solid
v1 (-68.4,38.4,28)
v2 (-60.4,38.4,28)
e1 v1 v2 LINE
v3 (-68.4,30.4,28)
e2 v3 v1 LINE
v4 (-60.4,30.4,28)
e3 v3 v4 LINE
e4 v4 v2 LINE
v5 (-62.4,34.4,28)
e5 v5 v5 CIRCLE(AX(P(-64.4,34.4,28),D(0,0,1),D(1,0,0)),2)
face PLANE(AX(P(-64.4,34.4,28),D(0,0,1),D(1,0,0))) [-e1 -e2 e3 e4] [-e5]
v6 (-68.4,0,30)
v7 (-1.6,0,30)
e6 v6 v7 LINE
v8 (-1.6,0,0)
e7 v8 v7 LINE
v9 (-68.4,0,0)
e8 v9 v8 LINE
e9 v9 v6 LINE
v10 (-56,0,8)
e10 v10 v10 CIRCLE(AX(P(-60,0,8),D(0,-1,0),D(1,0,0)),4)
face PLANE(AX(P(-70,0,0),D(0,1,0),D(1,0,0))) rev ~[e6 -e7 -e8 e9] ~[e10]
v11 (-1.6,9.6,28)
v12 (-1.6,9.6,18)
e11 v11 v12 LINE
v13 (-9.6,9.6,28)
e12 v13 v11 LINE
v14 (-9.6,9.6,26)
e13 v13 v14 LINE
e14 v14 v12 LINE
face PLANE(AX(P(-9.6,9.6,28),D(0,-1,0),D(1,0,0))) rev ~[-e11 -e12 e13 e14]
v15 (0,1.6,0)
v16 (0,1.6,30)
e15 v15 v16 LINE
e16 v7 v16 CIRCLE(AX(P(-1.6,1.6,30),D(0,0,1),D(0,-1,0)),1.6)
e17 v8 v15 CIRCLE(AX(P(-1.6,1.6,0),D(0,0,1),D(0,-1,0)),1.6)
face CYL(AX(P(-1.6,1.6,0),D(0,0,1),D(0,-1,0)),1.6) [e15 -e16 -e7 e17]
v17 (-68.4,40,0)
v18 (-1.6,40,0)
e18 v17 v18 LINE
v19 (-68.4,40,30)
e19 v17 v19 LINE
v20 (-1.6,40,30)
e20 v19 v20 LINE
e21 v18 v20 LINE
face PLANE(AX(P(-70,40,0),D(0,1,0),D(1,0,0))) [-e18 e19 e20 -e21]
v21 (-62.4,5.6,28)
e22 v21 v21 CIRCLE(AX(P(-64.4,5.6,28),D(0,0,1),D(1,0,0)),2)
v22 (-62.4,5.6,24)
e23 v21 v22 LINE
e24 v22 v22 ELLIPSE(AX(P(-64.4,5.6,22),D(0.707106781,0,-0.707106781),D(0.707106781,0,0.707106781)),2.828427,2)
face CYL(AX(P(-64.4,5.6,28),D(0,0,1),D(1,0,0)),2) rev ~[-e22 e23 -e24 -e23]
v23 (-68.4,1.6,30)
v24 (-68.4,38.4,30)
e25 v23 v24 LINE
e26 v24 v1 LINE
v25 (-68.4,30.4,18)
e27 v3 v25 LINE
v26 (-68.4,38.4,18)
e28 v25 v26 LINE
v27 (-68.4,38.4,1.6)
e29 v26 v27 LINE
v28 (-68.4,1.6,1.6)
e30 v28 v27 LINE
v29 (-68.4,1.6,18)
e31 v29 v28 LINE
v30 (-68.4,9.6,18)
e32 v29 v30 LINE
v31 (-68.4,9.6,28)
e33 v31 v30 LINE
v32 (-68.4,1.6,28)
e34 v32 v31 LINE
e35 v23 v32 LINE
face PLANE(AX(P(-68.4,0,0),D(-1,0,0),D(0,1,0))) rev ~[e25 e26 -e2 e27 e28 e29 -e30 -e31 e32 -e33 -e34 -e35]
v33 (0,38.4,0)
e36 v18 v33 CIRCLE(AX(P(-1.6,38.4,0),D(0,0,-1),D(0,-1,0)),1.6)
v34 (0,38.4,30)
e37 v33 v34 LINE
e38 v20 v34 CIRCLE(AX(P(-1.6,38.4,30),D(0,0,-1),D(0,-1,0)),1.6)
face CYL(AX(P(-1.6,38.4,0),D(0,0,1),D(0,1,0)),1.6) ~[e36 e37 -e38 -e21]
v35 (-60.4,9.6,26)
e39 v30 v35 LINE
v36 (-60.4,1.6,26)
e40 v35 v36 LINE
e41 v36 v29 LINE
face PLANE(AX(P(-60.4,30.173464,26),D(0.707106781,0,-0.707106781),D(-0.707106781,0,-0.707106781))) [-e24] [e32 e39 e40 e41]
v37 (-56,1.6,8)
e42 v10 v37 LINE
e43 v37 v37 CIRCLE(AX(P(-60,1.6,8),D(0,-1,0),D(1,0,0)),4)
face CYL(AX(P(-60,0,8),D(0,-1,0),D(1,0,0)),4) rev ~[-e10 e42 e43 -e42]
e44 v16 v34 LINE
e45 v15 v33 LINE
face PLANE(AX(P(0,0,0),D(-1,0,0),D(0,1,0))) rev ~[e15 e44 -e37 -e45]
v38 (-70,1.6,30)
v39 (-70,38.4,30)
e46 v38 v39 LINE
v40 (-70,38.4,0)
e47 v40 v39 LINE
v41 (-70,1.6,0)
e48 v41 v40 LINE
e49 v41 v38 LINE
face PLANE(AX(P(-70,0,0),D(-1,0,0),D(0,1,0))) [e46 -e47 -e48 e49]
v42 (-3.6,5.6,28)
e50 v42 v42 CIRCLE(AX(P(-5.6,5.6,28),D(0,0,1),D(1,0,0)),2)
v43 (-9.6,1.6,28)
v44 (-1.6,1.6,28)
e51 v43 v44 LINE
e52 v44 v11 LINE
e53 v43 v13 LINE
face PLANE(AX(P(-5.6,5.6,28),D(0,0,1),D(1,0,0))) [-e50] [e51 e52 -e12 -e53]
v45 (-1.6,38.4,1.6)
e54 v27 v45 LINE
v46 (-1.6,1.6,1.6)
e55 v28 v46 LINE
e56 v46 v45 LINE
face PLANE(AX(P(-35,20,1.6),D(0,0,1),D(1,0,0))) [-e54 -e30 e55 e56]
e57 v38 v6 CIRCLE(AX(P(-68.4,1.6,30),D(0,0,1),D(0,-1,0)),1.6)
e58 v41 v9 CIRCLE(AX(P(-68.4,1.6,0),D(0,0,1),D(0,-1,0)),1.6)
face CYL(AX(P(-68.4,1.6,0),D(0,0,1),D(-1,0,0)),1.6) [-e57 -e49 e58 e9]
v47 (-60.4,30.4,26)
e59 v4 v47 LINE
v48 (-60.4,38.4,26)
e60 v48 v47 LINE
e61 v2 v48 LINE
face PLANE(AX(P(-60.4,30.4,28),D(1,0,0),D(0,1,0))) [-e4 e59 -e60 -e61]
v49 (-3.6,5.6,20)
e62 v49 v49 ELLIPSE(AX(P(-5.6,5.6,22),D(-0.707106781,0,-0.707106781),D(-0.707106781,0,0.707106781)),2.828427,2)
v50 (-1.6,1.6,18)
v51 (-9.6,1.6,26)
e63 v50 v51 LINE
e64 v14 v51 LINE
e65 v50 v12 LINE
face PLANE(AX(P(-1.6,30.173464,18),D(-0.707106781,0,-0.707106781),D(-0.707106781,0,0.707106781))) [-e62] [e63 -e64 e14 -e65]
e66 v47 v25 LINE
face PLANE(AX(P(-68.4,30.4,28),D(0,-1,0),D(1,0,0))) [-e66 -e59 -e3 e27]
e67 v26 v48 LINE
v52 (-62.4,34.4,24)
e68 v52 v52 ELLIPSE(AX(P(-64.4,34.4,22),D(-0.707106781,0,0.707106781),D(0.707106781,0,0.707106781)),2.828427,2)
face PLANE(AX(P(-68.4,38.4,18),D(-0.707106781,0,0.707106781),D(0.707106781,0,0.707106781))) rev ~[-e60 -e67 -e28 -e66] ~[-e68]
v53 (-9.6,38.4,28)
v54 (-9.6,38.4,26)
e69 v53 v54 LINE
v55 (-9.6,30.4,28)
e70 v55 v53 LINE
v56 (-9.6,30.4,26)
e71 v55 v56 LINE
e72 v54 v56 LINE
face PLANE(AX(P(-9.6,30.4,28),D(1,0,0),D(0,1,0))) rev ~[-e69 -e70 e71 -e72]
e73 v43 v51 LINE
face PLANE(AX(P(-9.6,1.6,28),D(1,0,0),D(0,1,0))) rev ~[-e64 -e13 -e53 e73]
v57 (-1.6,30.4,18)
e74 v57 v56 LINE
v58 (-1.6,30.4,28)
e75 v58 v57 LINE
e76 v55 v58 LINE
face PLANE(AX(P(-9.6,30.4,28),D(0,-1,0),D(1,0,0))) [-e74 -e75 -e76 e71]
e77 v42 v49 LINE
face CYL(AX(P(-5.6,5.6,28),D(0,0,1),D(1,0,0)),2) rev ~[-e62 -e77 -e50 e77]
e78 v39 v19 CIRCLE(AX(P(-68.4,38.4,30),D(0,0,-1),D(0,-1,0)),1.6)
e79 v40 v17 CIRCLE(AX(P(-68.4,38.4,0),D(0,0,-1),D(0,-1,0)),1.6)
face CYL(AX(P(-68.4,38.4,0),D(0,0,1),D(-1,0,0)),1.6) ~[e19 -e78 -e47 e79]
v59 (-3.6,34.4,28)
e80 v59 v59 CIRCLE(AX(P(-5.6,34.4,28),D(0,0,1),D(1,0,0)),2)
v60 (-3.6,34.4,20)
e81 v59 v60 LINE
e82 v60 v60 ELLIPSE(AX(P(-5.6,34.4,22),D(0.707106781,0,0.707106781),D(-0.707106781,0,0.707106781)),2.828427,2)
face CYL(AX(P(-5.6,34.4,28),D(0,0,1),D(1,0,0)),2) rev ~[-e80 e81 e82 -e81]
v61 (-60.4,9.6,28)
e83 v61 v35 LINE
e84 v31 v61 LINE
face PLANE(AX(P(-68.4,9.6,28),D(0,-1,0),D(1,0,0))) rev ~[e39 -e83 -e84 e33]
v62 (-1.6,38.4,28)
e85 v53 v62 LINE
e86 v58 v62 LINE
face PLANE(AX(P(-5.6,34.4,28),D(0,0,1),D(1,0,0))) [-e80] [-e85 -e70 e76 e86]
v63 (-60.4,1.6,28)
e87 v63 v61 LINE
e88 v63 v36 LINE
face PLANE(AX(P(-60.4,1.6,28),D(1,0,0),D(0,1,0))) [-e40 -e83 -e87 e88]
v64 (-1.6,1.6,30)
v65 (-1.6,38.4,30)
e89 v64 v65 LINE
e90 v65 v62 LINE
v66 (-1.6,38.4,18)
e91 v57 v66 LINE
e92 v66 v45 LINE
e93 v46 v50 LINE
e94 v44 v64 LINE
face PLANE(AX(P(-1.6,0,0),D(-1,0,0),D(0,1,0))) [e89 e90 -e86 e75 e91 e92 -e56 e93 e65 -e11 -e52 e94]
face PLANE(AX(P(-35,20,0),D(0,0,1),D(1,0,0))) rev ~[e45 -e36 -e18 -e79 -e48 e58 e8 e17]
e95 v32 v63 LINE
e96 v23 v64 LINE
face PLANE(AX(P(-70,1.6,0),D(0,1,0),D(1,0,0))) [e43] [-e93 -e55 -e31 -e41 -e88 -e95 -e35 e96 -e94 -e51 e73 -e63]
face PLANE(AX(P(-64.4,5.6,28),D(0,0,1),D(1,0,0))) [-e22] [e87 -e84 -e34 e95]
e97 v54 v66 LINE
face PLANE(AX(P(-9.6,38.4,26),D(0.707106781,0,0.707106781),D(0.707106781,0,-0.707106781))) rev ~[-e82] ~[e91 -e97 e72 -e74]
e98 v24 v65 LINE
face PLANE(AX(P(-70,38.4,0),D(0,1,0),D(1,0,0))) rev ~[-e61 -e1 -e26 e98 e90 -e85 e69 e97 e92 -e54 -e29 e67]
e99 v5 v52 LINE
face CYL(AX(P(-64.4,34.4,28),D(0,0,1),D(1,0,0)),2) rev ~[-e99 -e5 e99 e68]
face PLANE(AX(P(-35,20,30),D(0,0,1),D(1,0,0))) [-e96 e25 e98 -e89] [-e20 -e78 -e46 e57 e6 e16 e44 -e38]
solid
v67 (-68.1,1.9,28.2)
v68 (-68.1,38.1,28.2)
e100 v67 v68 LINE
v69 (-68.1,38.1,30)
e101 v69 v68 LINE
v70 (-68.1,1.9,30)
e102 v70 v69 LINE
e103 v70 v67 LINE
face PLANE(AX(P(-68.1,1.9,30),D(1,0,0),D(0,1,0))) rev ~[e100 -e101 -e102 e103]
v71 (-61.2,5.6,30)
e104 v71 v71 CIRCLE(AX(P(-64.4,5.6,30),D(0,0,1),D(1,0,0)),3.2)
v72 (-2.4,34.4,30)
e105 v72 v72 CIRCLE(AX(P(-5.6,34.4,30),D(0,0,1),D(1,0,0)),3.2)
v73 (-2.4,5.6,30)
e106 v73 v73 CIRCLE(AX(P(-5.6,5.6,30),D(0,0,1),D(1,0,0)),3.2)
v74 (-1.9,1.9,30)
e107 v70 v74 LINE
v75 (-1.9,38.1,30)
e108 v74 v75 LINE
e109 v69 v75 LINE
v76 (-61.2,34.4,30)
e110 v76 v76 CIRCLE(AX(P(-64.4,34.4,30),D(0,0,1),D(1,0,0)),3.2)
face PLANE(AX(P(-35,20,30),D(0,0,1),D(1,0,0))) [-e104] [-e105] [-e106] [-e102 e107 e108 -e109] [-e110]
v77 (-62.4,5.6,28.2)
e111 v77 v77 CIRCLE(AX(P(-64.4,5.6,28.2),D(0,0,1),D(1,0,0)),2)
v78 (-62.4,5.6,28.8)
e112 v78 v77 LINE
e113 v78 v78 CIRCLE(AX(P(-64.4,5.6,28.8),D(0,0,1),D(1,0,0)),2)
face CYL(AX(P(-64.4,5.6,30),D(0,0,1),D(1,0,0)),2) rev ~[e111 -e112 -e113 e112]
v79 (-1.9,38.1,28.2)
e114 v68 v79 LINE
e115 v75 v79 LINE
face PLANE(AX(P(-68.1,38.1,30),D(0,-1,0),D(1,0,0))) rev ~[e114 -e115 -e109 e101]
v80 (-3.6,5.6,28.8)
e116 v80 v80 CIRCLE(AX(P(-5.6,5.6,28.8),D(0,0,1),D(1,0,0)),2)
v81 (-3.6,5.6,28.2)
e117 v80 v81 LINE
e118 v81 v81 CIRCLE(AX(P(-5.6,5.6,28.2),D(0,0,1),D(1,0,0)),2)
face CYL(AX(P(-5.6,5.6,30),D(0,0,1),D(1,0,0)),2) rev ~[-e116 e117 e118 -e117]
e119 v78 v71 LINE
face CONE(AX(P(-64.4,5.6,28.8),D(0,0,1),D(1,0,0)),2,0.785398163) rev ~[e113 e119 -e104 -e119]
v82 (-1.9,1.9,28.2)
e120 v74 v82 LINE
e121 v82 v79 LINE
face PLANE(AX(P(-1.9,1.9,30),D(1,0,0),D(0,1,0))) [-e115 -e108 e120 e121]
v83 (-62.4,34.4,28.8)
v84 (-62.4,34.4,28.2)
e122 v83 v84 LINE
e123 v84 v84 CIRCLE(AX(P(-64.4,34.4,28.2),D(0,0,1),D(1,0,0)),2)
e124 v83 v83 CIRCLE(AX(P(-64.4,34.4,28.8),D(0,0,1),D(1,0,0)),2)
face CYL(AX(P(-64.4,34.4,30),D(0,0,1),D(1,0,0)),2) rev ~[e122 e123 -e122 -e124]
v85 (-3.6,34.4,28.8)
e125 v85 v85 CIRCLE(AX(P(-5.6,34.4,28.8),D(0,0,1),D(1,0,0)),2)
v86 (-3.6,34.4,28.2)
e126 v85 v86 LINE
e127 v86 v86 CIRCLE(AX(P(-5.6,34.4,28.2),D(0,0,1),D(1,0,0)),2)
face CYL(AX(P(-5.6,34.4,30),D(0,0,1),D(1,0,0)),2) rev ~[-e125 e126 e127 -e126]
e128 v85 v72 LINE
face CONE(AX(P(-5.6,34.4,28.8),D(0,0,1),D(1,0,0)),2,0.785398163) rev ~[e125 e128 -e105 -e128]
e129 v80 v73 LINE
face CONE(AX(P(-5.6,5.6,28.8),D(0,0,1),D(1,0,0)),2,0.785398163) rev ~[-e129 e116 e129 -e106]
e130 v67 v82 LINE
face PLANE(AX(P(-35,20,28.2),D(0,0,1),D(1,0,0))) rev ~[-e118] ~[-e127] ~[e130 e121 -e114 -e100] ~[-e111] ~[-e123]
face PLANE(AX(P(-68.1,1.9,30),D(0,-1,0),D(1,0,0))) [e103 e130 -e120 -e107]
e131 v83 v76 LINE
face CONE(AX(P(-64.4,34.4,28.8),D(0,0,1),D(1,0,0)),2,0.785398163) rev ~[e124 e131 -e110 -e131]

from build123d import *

# Parameters (mm, degrees)
F0_W        = 70
F0_H        = 40
F1_DEPTH    = 30
F2_T        = -1.6
F4_W        = 8
F4_H        = 8
F4_R        = 2
F5_DEPTH    = 10
F6_T1_DEPTH = 28.5734639037
F6_T3_DEPTH = 28.5734639037
F7_R        = 4
F8_DEPTH    = 25
F9_W        = 66.2
F9_H        = 36.2
F9_R        = 2
F10_DEPTH   = 1.8
F11_SIZE    = 1.2
F12_R       = 1.6


# Not quite as in the source:
# - a fillet or chamfer that OpenCascade refuses, or shapes differently, is made with other operations: its cross-section is extruded or revolved along the edge and cut away or added


with BuildPart() as f1:
    # F0 (on Top) → F1 (new body)
    with BuildSketch(Plane.XY):
        with Locations((-35, 20)):
            Rectangle(F0_W, F0_H)
    extrude(amount=F1_DEPTH)

    # F2
    f2_openings = [f1.faces().sort_by_distance(p)[0] for p in [
        (-35, 20, 30),
    ]]
    offset(amount=F2_T, openings=f2_openings)

    # F4 (on offset) → F5 (join)
    with BuildSketch(Plane.XY.offset(28)):
        with Locations((-64.4, 34.4)):
            Rectangle(F4_W, F4_H)
        with Locations((-64.4, 34.4)):
            Circle(F4_R, mode=Mode.SUBTRACT)
        with Locations((-5.6, 34.4)):
            Rectangle(F4_W, F4_H)
        with Locations((-5.6, 34.4)):
            Circle(F4_R, mode=Mode.SUBTRACT)
        with Locations((-64.4, 5.6)):
            Rectangle(F4_W, F4_H)
        with Locations((-64.4, 5.6)):
            Circle(F4_R, mode=Mode.SUBTRACT)
        with Locations((-5.6, 5.6)):
            Rectangle(F4_W, F4_H)
        with Locations((-5.6, 5.6)):
            Circle(F4_R, mode=Mode.SUBTRACT)
    extrude(amount=-F5_DEPTH)

    # F6: chamfer of 8 on 4 edges, made by hand

    # F6_s2 → F6_t1 (cut)
    with BuildSketch(Plane.XZ.offset(-38.4)):
        Polygon((-68.4, 18), (-60.4, 26), (-60.4, 18), align=None)
        Polygon((-9.6, 26), (-1.6, 18), (-9.6, 18), align=None)
    extrude(amount=F6_T1_DEPTH, mode=Mode.SUBTRACT)

    # F6_s4 → F6_t3 (cut)
    with BuildSketch(Plane.XZ.offset(-30.1734639037)):
        Polygon((-60.4, 26), (-68.4, 18), (-60.4, 18), align=None)
        Polygon((-1.6, 18), (-9.6, 26), (-9.6, 18), align=None)
    extrude(amount=F6_T3_DEPTH, mode=Mode.SUBTRACT)

    # F7 (on face) → F8 (cut)
    with BuildSketch(Plane.XZ):
        with Locations((-60, 8)):
            Circle(F7_R)
    extrude(amount=-F8_DEPTH, mode=Mode.SUBTRACT)

    # F12
    f12_edges = [f1.edges().sort_by_distance(p)[0] for p in [
        (-70, 0, 15),
        (-70, 40, 15),
        (0, 0, 15),
        (0, 40, 15),
    ]]
    fillet(f12_edges, radius=F12_R)


with BuildPart() as f10:
    # F9 (on face) → F10 (new body)
    with BuildSketch(Plane.XY.offset(30)):
        with Locations((-35, 20)):
            Rectangle(F9_W, F9_H)
        with Locations((-64.4, 5.6)):
            Circle(F9_R, mode=Mode.SUBTRACT)
        with Locations((-5.6, 5.6)):
            Circle(F9_R, mode=Mode.SUBTRACT)
        with Locations((-64.4, 34.4)):
            Circle(F9_R, mode=Mode.SUBTRACT)
        with Locations((-5.6, 34.4)):
            Circle(F9_R, mode=Mode.SUBTRACT)
    extrude(amount=-F10_DEPTH)

    # F11
    f11_edges = [f10.edges().sort_by_distance(p)[0] for p in [
        (-7.6, 5.6, 30),
        (-66.4, 5.6, 30),
        (-66.4, 34.4, 30),
        (-7.6, 34.4, 30),
    ]]
    chamfer(f11_edges, length=F11_SIZE)


solid = Compound([f1.part, f10.part])
